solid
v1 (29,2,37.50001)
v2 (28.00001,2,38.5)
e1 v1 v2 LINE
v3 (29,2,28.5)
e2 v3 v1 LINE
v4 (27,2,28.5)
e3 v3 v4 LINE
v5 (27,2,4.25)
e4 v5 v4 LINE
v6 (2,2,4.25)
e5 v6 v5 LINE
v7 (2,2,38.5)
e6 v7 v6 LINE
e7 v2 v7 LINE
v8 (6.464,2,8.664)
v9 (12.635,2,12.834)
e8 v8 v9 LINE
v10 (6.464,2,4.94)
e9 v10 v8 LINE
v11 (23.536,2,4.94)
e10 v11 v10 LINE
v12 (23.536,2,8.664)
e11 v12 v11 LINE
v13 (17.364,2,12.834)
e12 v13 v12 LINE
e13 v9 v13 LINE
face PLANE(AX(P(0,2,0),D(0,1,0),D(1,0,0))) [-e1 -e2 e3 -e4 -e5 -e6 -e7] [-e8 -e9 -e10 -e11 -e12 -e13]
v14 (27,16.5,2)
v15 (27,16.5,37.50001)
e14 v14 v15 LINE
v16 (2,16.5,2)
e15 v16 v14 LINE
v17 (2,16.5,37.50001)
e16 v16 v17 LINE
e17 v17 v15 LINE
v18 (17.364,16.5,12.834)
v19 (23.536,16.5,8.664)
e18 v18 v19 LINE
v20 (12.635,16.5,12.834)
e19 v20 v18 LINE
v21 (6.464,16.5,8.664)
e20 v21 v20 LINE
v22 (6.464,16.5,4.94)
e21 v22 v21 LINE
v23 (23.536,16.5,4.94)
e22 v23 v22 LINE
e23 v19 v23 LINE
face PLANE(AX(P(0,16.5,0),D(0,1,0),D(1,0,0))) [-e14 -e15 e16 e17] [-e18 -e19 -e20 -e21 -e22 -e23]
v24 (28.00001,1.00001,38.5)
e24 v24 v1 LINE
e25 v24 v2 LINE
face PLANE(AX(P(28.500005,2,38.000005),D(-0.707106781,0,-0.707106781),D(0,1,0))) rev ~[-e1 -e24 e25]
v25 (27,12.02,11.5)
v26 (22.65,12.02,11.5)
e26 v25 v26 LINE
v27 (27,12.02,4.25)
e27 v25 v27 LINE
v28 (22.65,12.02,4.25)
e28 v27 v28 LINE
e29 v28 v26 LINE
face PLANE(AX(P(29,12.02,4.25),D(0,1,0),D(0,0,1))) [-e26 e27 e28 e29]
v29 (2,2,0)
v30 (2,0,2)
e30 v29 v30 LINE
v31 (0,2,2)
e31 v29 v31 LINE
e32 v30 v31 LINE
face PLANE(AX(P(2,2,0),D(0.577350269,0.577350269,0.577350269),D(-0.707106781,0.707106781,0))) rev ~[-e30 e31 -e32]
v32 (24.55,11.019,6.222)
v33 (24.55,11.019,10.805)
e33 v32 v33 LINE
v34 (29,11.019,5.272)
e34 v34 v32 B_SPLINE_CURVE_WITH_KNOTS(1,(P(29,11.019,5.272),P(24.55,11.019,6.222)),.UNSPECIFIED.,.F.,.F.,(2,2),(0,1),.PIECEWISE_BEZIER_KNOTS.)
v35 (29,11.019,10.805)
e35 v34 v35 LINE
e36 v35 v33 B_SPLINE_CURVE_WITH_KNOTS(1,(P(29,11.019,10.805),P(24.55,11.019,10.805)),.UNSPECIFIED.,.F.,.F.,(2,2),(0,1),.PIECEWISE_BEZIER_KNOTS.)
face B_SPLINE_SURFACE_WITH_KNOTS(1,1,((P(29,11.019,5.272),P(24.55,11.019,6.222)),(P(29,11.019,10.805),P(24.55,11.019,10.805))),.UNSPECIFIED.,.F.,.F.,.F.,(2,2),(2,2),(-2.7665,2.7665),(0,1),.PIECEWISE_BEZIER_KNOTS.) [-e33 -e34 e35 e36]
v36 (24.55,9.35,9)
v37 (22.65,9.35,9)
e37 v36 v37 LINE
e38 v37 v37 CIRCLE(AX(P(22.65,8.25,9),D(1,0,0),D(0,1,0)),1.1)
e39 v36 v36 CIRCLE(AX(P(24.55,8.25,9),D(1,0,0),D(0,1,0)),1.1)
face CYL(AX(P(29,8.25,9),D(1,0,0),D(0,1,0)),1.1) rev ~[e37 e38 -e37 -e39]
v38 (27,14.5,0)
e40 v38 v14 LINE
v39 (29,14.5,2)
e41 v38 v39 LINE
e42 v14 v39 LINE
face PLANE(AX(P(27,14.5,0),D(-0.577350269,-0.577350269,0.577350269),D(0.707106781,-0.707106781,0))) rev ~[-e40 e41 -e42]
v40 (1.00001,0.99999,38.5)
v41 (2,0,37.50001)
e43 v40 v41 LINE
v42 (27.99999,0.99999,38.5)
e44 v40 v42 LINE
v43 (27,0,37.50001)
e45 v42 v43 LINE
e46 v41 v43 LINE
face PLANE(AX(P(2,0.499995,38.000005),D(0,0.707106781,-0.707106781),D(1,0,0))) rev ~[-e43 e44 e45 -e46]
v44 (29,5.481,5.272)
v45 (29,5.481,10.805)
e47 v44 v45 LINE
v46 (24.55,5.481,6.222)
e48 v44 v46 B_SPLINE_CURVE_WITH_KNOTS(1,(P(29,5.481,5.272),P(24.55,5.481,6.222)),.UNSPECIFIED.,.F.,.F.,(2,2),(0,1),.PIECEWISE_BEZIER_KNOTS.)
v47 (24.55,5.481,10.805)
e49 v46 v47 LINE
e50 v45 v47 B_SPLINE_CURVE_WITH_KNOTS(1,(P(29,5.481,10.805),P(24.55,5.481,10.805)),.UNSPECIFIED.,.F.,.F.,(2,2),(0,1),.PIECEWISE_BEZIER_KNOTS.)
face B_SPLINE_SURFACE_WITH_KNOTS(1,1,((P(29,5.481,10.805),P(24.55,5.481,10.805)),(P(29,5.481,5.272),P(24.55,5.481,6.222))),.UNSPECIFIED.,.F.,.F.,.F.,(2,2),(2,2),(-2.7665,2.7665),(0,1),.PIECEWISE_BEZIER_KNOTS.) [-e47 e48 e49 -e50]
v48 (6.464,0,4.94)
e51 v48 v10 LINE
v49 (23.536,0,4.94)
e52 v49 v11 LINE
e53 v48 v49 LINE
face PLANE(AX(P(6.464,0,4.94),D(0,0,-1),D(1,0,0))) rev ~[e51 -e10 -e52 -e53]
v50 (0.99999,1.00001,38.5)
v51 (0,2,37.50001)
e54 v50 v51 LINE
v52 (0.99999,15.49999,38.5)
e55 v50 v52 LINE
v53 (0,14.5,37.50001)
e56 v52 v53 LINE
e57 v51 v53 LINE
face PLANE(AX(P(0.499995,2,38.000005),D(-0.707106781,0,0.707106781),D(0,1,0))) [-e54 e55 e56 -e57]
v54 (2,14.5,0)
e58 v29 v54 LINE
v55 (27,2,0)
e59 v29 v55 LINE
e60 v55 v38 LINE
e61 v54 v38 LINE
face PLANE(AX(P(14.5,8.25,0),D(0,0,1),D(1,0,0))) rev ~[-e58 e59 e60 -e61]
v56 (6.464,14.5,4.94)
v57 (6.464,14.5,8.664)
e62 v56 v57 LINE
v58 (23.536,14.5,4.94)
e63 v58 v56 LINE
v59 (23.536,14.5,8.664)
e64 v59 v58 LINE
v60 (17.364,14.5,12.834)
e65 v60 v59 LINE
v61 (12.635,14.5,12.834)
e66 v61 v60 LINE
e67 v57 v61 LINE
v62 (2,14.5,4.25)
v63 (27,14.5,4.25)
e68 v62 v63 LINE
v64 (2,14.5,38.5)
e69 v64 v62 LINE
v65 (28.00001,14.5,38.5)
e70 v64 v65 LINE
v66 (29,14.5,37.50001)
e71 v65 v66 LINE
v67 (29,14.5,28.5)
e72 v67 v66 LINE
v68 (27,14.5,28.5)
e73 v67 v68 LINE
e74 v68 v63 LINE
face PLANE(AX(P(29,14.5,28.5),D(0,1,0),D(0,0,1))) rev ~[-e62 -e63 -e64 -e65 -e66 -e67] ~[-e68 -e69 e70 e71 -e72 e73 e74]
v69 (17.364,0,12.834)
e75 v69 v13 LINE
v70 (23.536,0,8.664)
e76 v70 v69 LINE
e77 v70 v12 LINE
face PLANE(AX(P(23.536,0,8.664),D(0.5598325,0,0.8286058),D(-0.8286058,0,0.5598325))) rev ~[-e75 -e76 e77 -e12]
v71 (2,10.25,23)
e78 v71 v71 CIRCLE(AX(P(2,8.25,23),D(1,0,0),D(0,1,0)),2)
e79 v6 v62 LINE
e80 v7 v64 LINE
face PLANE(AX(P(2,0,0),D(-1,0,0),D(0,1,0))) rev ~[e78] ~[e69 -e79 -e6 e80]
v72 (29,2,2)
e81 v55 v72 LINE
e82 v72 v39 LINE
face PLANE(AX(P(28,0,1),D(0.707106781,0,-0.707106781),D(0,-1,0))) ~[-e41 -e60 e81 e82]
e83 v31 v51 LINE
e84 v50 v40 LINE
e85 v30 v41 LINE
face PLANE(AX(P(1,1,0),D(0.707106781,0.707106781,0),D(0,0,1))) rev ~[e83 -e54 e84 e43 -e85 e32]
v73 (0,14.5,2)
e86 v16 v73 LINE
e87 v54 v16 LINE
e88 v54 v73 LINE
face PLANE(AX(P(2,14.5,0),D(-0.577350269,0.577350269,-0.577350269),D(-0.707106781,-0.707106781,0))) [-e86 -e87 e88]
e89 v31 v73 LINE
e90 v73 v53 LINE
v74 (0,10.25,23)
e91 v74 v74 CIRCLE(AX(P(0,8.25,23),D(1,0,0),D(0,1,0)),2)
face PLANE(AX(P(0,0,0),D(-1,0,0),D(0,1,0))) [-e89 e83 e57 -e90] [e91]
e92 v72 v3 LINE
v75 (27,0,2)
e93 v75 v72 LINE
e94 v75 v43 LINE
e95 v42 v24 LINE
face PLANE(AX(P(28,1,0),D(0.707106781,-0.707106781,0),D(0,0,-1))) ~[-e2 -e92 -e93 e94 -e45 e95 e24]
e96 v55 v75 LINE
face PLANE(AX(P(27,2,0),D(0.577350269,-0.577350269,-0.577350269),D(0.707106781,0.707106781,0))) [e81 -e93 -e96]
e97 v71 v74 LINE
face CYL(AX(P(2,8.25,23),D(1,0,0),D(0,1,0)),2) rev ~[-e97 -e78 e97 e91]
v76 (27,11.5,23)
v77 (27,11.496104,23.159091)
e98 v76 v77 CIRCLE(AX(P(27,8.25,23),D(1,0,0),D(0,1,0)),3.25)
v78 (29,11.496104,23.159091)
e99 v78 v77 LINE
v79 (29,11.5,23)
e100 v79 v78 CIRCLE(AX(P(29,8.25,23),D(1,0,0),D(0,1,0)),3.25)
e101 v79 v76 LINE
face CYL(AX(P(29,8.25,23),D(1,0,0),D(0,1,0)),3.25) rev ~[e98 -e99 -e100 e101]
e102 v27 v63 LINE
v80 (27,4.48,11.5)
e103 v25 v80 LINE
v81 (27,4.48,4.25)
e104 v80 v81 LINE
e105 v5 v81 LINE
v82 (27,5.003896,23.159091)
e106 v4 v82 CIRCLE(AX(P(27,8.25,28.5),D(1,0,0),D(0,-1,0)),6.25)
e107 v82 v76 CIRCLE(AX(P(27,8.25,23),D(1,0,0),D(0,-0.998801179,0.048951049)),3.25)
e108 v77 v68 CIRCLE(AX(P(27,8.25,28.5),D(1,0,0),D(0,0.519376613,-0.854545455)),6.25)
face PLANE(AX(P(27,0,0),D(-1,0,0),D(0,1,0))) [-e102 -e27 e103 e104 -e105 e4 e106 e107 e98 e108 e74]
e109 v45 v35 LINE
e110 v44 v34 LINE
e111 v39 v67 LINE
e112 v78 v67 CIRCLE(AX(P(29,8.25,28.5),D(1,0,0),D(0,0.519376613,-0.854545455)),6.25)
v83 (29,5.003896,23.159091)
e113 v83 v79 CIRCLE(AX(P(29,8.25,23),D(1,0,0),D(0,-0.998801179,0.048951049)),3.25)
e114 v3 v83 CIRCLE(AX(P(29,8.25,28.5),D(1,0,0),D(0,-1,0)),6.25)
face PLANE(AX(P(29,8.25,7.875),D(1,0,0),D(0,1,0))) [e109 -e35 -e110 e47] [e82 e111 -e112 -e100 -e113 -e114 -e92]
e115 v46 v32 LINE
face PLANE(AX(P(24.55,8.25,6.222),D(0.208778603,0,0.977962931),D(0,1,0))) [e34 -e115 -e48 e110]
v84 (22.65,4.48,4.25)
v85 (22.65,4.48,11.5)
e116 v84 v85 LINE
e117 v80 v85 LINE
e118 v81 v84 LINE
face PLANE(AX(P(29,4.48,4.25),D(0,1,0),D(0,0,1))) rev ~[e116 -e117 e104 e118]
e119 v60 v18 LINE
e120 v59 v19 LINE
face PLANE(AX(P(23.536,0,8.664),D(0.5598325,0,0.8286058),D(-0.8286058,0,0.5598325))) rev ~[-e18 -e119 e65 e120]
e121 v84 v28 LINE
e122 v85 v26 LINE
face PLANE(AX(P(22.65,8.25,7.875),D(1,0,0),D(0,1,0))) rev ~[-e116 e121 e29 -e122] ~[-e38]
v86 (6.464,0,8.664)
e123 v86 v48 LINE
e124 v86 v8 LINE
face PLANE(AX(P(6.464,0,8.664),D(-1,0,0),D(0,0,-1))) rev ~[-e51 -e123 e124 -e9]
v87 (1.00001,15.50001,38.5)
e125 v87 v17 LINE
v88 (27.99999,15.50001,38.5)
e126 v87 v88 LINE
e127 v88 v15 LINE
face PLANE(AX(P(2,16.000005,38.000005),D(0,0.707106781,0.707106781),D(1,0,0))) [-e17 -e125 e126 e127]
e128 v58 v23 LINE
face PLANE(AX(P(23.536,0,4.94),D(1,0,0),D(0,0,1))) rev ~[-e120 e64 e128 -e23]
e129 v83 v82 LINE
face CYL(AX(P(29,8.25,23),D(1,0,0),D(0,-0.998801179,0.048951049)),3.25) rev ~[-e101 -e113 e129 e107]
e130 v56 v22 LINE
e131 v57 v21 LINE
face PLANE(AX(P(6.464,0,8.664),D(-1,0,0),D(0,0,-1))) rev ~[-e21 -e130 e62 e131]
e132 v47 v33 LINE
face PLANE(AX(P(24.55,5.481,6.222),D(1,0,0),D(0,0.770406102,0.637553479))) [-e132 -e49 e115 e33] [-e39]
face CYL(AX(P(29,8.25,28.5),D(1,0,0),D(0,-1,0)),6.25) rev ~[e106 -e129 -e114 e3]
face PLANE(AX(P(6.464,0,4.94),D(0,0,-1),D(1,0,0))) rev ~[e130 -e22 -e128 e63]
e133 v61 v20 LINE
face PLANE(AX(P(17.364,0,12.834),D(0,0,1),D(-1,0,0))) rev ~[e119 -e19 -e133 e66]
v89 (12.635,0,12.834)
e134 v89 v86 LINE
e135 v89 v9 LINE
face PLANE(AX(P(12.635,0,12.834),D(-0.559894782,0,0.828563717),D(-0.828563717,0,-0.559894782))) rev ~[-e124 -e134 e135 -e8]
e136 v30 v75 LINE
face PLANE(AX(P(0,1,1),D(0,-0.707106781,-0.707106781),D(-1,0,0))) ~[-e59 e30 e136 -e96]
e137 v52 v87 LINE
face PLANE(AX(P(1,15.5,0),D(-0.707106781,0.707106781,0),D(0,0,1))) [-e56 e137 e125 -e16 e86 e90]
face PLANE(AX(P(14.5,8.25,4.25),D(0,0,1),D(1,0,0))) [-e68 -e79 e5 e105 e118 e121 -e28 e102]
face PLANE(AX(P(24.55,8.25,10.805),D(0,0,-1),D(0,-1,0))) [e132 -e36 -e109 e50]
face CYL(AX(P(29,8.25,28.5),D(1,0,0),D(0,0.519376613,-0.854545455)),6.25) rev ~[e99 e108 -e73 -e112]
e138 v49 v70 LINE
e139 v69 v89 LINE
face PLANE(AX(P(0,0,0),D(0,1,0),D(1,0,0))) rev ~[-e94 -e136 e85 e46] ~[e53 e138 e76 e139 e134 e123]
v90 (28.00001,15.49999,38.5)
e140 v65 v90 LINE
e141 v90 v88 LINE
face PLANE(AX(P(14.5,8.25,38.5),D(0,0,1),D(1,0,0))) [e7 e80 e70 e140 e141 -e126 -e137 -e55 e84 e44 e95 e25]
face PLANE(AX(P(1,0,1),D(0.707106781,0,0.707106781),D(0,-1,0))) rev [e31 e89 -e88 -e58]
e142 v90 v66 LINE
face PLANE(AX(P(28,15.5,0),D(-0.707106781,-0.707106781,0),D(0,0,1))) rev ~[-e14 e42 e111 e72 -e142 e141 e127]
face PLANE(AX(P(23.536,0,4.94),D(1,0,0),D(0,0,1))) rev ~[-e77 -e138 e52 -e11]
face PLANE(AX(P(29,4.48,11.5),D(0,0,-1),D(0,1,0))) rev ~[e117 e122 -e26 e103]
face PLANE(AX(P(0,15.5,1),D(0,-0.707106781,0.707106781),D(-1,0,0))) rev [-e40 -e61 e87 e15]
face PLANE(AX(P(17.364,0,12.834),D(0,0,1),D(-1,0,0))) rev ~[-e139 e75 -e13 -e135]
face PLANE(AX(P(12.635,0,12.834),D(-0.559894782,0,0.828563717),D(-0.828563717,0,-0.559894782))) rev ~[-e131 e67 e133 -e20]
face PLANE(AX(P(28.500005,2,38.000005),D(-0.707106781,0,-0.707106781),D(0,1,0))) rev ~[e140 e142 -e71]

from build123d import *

# Parameters (mm, degrees)
F0_W      = 29
F0_H      = 16.5
F1_DEPTH  = 38.5
F2_T      = -2
F3_DEPTH  = 2.25
F4_SIZE   = 2
F5_SIZE   = 0.99999
F7_DEPTH  = 16.501
F9_DEPTH  = 2
F10_R     = 2
F11_DEPTH = 2.001
F12_W     = 7.54
F12_H     = 7.25
F12_R     = 1.1
F13_DEPTH = 6.35
F14_W     = 5.538
F14_H     = 5.533
F16_W     = 5.538
F16_H     = 4.583


# Not quite as in the source:
# - a fillet or chamfer is up to 0.001 mm smaller than in the source, because OpenCascade refuses the exact size


with BuildPart() as f1:
    # F0 (on Top) → F1 (new body)
    with BuildSketch(Plane.XY):
        with Locations((14.5, 8.25)):
            Rectangle(F0_W, F0_H)
    extrude(amount=F1_DEPTH)

    # F2
    f2_openings = [f1.faces().sort_by_distance(p)[0] for p in [
        (14.5, 8.25, 38.5),
    ]]
    offset(amount=F2_T, openings=f2_openings)

    # F3 (add): a face of the model
    f3_faces = [f1.faces().sort_by_distance(p)[0] for p in [
        (14.5, 8.25, 2),
    ]]
    extrude(f3_faces, amount=F3_DEPTH)

    # F4
    f4_edges = [f1.edges().sort_by_distance(p)[0] for p in [
        (0, 16.5, 19.25),
        (0, 0, 19.25),
        (29, 16.5, 19.25),
        (29, 0, 19.25),
        (14.5, 16.5, 0),
        (14.5, 0, 0),
        (29, 8.25, 0),
        (0, 8.25, 0),
    ]]
    chamfer(f4_edges, length=F4_SIZE)

    # F5 (size 1 in the source; OpenCascade refuses exactly that, so slightly less here)
    f5_edges = [f1.edges().sort_by_distance(p)[0] for p in [
        (14.5, 16.5, 38.5),
        (14.5, 0, 38.5),
        (0, 8.25, 38.5),
        (29, 8.25, 38.5),
    ]]
    chamfer(f5_edges, length=F5_SIZE)

    # F6 (on face) → F7 (cut, through all)
    with BuildSketch(Plane.XZ):
        Polygon((6.464, 8.664), (6.464, 4.94), (23.536, 4.94), (23.536, 8.664), (17.364, 12.834), (12.635, 12.834), align=None)
    extrude(amount=-F7_DEPTH, mode=Mode.SUBTRACT)

    # F8 (on face) → F9 (cut, through all)
    with BuildSketch(Plane.YZ.offset(29)):
        with BuildLine():
            Line((14.5, 38.5), (2, 38.5))
            Line((2, 38.5), (2, 28.5))
            ThreePointArc((2, 28.5), (8.25, 34.75), (14.5, 28.5))
            Line((14.5, 28.5), (14.5, 38.5))
        make_face()
        with BuildLine():
            ThreePointArc((14.5, 28.5), (8.25, 34.75), (2, 28.5))
            Line((2, 28.5), (14.5, 28.5))
        make_face()
        with BuildLine():
            Line((14.5, 28.5), (2, 28.5))
            ThreePointArc((2, 28.5), (2.8024937382, 25.4361502113), (5.0038961688, 23.1590909091))
            ThreePointArc((5.0038961688, 23.1590909091), (8.25, 26.25), (11.4961038312, 23.1590909091))
            ThreePointArc((11.4961038312, 23.1590909091), (13.6975062618, 25.4361502113), (14.5, 28.5))
        make_face()
        with BuildLine():
            ThreePointArc((11.4961038312, 23.1590909091), (8.25, 26.25), (5.0038961688, 23.1590909091))
            ThreePointArc((5.0038961688, 23.1590909091), (8.25, 22.25), (11.4961038312, 23.1590909091))
        make_face()
        with BuildLine():
            ThreePointArc((11.4961038312, 23.1590909091), (8.25, 22.25), (5.0038961688, 23.1590909091))
            ThreePointArc((5.0038961688, 23.1590909091), (8.1704306945, 19.7509741882), (11.5, 23))
            ThreePointArc((11.5, 23), (11.4990258118, 23.0795693055), (11.4961038312, 23.1590909091))
        make_face()
    extrude(amount=-F9_DEPTH, mode=Mode.SUBTRACT)

    # F10 (on face) → F11 (cut, through all)
    with BuildSketch(Plane.YZ.offset(2)):
        with Locations((8.25, 23)):
            Circle(F10_R)
    extrude(amount=-F11_DEPTH, mode=Mode.SUBTRACT)

    # F12 (on face) → F13 (join)
    with BuildSketch(Plane.YZ.offset(29)):
        with Locations((8.25, 7.875)):
            Rectangle(F12_W, F12_H)
        with Locations((8.25, 9)):
            Circle(F12_R, mode=Mode.SUBTRACT)
    extrude(amount=-F13_DEPTH)

    # F14 (on face) → F17 section 0
    with BuildSketch(Plane.YZ.offset(29)):
        with Locations((8.25, 8.0385)):
            Rectangle(F14_W, F14_H)
    # F16 (on offset) → F17 section 1
    with BuildSketch(Plane.YZ.offset(24.55)):
        with Locations((8.25, 8.5135)):
            Rectangle(F16_W, F16_H)
    loft(mode=Mode.SUBTRACT)


solid = f1.part
